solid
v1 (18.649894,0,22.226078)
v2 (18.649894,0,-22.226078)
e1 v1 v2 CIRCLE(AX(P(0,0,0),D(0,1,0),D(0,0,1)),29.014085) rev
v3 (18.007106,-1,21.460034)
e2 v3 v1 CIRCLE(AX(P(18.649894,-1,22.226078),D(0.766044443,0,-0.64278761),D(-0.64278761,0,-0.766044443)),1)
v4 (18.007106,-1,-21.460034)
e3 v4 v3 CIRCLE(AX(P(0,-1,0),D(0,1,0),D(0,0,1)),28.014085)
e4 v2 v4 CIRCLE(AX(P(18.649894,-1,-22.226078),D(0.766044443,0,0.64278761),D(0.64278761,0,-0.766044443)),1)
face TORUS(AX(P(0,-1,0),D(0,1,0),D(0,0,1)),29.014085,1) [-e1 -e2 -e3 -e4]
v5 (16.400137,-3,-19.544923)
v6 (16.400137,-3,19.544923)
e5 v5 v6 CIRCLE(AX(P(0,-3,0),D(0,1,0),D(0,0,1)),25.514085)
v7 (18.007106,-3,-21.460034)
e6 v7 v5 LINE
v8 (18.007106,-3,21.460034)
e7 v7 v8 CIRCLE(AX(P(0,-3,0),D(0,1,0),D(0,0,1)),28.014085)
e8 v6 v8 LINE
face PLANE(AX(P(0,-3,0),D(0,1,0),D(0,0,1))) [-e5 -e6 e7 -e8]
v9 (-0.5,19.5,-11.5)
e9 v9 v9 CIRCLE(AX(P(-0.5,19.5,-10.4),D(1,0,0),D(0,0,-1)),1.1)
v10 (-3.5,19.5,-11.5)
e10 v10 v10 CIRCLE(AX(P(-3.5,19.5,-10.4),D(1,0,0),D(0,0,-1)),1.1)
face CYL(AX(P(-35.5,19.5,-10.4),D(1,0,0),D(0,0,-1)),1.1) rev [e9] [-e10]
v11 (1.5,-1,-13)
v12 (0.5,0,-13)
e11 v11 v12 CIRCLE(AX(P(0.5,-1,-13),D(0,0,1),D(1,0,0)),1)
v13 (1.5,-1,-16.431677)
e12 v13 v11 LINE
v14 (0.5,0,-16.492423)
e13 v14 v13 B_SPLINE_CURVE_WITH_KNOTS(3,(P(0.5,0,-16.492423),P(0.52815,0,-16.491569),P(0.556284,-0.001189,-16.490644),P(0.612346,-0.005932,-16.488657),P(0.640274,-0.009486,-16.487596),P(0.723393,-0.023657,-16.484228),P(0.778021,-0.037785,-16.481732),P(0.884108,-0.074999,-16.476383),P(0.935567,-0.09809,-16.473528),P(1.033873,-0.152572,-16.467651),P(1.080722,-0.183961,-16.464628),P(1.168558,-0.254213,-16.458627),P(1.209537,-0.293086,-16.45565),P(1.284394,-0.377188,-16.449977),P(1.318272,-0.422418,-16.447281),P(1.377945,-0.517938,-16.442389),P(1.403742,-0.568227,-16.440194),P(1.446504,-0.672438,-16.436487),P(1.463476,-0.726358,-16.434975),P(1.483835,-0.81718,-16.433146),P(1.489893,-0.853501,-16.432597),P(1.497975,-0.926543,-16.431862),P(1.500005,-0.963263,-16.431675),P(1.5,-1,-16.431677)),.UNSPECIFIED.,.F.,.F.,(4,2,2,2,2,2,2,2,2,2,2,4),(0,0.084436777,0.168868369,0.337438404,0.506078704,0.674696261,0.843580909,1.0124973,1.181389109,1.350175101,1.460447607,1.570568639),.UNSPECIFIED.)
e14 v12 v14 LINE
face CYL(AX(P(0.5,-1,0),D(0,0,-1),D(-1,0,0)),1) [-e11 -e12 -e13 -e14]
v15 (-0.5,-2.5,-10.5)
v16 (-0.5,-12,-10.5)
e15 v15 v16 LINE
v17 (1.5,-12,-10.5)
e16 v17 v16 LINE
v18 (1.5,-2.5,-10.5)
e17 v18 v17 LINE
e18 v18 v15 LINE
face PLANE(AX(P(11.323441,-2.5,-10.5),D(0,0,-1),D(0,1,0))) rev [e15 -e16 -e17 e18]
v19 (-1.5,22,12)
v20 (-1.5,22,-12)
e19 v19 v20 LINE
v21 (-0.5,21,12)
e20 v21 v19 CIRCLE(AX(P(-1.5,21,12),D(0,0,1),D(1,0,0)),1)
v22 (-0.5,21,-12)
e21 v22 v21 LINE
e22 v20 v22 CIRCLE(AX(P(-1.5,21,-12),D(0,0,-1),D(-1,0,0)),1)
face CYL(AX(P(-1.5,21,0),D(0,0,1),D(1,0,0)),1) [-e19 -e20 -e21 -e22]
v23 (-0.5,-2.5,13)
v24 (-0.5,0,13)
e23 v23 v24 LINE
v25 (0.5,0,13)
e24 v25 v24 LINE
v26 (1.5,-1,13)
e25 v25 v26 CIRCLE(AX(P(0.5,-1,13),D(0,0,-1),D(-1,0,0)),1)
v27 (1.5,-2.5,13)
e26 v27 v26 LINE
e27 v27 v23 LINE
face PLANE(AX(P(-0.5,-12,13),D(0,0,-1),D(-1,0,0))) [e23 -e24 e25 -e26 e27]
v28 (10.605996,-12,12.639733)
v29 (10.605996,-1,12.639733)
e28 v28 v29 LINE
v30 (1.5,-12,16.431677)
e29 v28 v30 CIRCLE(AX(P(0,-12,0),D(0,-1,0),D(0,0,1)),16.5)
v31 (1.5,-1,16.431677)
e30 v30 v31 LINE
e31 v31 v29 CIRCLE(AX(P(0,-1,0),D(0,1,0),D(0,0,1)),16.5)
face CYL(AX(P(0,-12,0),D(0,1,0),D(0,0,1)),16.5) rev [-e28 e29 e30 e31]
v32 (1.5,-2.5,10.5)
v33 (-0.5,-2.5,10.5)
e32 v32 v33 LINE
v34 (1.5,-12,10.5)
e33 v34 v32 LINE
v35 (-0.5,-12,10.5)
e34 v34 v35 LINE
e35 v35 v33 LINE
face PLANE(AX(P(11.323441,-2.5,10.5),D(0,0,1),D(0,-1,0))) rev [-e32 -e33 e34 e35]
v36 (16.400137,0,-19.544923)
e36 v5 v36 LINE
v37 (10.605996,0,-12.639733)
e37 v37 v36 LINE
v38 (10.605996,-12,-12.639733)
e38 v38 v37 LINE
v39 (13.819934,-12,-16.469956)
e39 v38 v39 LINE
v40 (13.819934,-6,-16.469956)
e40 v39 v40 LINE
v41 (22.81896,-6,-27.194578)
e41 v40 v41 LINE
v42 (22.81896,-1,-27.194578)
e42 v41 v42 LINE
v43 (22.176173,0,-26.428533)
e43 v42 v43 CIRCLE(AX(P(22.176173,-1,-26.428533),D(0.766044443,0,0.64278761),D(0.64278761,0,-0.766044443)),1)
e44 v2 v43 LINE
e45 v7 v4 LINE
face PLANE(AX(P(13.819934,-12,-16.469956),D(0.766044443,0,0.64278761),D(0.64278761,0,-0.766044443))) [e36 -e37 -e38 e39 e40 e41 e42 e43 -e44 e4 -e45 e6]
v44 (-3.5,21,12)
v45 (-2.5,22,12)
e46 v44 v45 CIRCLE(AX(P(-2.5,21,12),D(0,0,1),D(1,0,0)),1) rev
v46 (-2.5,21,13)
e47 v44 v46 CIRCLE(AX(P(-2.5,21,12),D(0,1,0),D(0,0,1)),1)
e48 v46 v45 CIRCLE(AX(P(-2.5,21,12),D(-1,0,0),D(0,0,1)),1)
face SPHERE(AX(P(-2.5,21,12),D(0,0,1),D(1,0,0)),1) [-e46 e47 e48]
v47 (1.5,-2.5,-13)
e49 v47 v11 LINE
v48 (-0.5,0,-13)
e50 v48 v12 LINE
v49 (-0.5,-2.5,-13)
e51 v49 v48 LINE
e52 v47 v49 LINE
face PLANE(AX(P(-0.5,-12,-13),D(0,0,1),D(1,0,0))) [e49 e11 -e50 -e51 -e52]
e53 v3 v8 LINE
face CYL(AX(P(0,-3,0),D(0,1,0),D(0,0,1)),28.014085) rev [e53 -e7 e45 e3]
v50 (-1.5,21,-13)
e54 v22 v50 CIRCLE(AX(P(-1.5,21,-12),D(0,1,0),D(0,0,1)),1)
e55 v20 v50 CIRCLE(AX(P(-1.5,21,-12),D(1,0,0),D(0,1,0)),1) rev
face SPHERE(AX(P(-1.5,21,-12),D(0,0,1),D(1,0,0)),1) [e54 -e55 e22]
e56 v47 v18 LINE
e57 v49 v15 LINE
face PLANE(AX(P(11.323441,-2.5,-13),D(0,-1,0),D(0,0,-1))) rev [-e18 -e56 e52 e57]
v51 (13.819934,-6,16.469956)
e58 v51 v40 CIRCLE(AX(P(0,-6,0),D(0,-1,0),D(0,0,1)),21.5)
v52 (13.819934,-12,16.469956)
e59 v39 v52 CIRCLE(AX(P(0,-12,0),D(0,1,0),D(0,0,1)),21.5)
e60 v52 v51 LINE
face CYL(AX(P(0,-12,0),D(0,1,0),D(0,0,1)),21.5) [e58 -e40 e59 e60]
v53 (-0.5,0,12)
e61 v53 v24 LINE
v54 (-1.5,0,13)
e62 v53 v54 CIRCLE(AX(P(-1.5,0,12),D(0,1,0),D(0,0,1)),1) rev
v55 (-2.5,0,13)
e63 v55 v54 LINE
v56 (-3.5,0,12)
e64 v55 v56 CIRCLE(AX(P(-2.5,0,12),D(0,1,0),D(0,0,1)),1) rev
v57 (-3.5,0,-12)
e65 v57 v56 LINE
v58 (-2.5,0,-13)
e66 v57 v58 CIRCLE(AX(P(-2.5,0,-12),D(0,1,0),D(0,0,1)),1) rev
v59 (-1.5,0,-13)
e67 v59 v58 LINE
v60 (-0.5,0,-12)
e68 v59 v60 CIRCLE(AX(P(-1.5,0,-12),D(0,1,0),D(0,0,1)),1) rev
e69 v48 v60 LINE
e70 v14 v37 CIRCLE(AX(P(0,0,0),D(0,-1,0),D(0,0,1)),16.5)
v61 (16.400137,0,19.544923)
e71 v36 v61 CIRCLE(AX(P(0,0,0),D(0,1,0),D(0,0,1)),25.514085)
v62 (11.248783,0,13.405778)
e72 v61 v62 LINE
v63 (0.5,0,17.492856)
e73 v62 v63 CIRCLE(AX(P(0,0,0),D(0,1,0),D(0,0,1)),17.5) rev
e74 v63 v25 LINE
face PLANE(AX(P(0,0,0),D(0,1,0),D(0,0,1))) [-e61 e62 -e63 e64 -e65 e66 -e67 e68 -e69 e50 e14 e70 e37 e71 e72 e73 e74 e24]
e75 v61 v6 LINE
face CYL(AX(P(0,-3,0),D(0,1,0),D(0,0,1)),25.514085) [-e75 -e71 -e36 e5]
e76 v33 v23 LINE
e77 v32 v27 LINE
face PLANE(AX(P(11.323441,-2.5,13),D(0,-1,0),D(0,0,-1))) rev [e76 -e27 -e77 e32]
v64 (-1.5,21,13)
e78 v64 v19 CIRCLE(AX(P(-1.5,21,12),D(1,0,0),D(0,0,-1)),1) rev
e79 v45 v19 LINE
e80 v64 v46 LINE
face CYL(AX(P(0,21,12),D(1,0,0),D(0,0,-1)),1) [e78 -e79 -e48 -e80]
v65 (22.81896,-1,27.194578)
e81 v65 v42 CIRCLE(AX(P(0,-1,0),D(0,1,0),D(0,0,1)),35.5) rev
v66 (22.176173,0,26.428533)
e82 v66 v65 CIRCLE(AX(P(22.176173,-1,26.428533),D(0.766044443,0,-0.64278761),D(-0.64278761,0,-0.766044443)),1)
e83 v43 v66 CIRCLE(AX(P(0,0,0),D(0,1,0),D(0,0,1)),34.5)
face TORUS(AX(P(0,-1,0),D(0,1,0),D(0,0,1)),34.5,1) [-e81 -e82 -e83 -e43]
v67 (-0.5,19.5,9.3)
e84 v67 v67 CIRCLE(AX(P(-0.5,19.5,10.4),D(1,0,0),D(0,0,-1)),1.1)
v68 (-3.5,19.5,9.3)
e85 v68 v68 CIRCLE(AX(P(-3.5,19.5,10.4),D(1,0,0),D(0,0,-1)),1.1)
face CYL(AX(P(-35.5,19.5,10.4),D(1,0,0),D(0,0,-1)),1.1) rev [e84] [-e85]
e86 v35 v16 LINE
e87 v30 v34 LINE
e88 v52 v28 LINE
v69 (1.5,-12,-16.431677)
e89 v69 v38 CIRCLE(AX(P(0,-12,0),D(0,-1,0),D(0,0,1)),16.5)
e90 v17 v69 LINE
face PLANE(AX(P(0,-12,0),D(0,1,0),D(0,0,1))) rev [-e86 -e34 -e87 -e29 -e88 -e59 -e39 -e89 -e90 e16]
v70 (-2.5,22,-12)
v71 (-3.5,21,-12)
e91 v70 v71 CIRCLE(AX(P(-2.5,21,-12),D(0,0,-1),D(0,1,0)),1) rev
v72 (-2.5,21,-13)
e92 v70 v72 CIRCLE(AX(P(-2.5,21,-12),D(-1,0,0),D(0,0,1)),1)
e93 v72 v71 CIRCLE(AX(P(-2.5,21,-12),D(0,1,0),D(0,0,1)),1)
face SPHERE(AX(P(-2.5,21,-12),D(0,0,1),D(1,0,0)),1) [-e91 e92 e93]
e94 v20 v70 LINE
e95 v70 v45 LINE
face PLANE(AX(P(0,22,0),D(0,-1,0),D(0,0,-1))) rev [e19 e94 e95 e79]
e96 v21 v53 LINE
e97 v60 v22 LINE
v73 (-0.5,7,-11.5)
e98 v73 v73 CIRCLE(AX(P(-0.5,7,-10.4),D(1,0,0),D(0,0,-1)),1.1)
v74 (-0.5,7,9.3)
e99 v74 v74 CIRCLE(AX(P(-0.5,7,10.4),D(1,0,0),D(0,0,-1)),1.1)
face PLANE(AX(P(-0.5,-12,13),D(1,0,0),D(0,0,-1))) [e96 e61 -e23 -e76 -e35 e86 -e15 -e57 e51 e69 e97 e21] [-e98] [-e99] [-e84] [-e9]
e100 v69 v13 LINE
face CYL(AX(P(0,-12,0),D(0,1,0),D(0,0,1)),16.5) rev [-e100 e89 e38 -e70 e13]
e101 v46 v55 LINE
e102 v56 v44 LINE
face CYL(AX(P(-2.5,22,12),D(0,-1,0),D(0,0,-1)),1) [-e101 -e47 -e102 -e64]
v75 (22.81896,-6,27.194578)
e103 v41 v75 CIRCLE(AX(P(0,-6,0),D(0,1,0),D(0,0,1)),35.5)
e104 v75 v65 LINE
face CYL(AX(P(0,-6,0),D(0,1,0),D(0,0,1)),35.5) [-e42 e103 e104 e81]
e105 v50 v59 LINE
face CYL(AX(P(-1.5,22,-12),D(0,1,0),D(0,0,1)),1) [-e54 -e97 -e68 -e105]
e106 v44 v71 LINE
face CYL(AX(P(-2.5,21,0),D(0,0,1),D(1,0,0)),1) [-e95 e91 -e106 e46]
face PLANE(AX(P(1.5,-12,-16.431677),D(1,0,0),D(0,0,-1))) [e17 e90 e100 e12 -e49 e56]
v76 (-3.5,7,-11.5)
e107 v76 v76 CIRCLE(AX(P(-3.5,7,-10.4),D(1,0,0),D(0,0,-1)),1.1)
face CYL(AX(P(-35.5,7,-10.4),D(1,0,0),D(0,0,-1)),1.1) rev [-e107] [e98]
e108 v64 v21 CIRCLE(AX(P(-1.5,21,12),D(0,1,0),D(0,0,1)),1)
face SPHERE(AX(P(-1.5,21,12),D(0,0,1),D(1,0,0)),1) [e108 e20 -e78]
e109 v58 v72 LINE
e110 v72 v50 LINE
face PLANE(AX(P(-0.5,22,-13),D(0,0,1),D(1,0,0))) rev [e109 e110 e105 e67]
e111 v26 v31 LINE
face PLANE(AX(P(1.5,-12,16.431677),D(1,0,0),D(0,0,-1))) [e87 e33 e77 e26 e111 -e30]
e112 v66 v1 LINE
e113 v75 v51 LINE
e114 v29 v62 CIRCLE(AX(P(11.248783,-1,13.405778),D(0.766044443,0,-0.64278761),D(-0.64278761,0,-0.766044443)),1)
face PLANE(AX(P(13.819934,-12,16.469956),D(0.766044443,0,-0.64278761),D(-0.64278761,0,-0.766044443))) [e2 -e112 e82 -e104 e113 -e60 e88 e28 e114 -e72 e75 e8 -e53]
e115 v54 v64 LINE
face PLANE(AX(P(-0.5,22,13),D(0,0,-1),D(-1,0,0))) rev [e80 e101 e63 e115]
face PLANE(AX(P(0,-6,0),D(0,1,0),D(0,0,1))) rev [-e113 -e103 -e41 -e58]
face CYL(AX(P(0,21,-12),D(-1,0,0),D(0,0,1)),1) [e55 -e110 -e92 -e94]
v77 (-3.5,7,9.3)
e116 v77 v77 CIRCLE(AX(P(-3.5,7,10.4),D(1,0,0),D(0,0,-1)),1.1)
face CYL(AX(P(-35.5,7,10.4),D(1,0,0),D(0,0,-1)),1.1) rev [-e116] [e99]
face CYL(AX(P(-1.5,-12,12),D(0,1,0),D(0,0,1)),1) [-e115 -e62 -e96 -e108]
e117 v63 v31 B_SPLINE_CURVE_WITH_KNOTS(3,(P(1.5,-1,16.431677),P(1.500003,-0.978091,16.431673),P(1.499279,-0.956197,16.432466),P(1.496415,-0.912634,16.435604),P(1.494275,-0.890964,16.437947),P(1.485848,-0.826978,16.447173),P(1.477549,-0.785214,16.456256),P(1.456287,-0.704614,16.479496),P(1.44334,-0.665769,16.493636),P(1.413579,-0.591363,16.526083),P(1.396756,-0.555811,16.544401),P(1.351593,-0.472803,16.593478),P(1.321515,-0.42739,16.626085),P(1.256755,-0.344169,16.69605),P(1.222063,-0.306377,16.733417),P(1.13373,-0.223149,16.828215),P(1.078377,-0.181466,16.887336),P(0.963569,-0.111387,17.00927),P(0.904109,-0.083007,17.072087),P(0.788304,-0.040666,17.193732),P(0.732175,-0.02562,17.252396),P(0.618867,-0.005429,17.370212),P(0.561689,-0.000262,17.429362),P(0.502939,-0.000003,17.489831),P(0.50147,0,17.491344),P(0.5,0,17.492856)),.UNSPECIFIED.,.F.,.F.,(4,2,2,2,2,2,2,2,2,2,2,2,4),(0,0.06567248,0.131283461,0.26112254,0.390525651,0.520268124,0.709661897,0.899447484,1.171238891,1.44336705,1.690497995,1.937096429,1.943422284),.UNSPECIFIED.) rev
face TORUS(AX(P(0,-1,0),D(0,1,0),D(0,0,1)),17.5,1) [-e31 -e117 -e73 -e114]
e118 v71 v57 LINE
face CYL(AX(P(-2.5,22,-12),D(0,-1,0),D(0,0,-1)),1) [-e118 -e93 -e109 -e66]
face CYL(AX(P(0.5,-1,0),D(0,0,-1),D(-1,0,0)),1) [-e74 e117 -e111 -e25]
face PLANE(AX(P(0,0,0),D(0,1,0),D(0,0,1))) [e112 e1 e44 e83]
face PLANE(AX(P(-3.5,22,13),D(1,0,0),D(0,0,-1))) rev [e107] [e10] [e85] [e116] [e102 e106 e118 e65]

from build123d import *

# Parameters (mm, degrees)
RESSALTO_EXTRUS_O1_DEPTH = 12
RESSALTO_EXTRUS_O3_DEPTH = 6
ESBO_O4_W                = 3
ESBO_O4_H                = 26
RESSALTO_EXTRUS_O4_DEPTH = 22
ESBO_O6_W                = 2.5
ESBO_O6_H                = 9.5
RESSALTO_EXTRUS_O5_DEPTH = 2
ESBO_O7_R                = 1.1
CORTE_EXTRUS_O1_DEPTH    = 55.490824916
ESBO_O8_R                = 28.014084507
ESBO_O8_R_2              = 25.514084507
CORTE_EXTRUS_O2_DEPTH    = 3
FILETE1_R                = 1


with BuildPart() as part:
    # Esboço1 → Ressalto-extrusão1 (new body)
    with BuildSketch(Plane(origin=(0, 0, 0), x_dir=(1, 0, 0), z_dir=(0, 1, 0))):
        with BuildLine():
            Line((1.5, -16.431676725), (1.5, -13))
            Line((1.5, -13), (-0.5, -13))
            Line((-0.5, -13), (-0.5, 13))
            Line((-0.5, 13), (1.5, 13))
            Line((1.5, 13), (1.5, 16.431676725))
            ThreePointArc((1.5, 16.431676725), (6.342987532, 15.232088142), (10.60599556, 12.639733311))
            Line((10.60599556, 12.639733311), (13.819933608, 16.469955527))
            ThreePointArc((13.819933608, 16.469955527), (-21.5, 0), (13.819933608, -16.469955527))
            Line((13.819933608, -16.469955527), (10.60599556, -12.639733311))
            ThreePointArc((10.60599556, -12.639733311), (6.342987532, -15.232088142), (1.5, -16.431676725))
        make_face()
    extrude(amount=-RESSALTO_EXTRUS_O1_DEPTH)

    # Esboço3 → Ressalto-extrusão3 (add)
    with BuildSketch(Plane(origin=(0, 0, 0), x_dir=(1, 0, 0), z_dir=(0, 1, 0))):
        with BuildLine():
            Line((13.819933608, -16.469955527), (22.818960144, -27.194577731))
            ThreePointArc((22.818960144, -27.194577731), (-35.5, 0), (22.818960144, 27.194577731))
            Line((22.818960144, 27.194577731), (13.819933608, 16.469955527))
            ThreePointArc((13.819933608, 16.469955527), (-21.5, 0), (13.819933608, -16.469955527))
        make_face()
    extrude(amount=-RESSALTO_EXTRUS_O3_DEPTH)

    # Esboço4 → Ressalto-extrusão4 (add)
    with BuildSketch(Plane(origin=(0, 0, 0), x_dir=(1, 0, 0), z_dir=(0, 1, 0))):
        with Locations((-2, 0)):
            Rectangle(ESBO_O4_W, ESBO_O4_H)
    extrude(amount=RESSALTO_EXTRUS_O4_DEPTH)

    # Esboço6 → Ressalto-extrusão5 (add)
    with BuildSketch(Plane(origin=(-0.5, 0, 0), x_dir=(0, 0, -1), z_dir=(1, 0, 0))):
        with Locations((-11.75, -7.25)):
            Rectangle(ESBO_O6_W, ESBO_O6_H)
        with Locations((11.75, -7.25)):
            Rectangle(ESBO_O6_W, ESBO_O6_H)
    extrude(amount=RESSALTO_EXTRUS_O5_DEPTH)

    # Esboço7 → Corte-extrusão1 (cut, through all)
    with BuildSketch(Plane(origin=(-0.5, 0, 0), x_dir=(0, 0, -1), z_dir=(1, 0, 0))):
        with Locations((-10.4, 19.5)):
            Circle(ESBO_O7_R)
        with Locations((10.4, 19.5)):
            Circle(ESBO_O7_R)
        with Locations((10.4, 7)):
            Circle(ESBO_O7_R)
        with Locations((-10.4, 7)):
            Circle(ESBO_O7_R)
    extrude(amount=-CORTE_EXTRUS_O1_DEPTH, mode=Mode.SUBTRACT)

    # Esboço8 → Corte-extrusão2 (cut)
    with BuildSketch(Plane(origin=(0, 0, 0), x_dir=(1, 0, 0), z_dir=(0, 1, 0))):
        Circle(ESBO_O8_R)
        Circle(ESBO_O8_R_2, mode=Mode.SUBTRACT)
    extrude(amount=-CORTE_EXTRUS_O2_DEPTH, mode=Mode.SUBTRACT)

    # Filete1
    # the kernel refuses this fillet: 1 mm, written as the material it takes off along each edge
    with BuildSketch(Plane(origin=(-2.5, 21, 12), x_dir=(0, 0, 1), z_dir=(-1, 0, 0))) as filete1_piece_1_section:
        Polygon((0, 0), (FILETE1_R * 1.02, 0), (FILETE1_R * 1.02, FILETE1_R * 1.02), (0, FILETE1_R * 1.02), align=None)
    filete1_piece_1 = extrude(amount=FILETE1_R * 1.02, mode=Mode.PRIVATE)
    filete1_piece_1 = filete1_piece_1 - Plane(origin=(-2.5, 21, 12), x_dir=(0, -0.7071067811865475, -0.7071067811865475), z_dir=(-1, 0, 0)) * Sphere(FILETE1_R, mode=Mode.PRIVATE)
    add(filete1_piece_1, mode=Mode.SUBTRACT)
    with BuildSketch(Plane(origin=(-1.5, 21, 12), x_dir=(0, 0, 1), z_dir=(0, 1, 0))) as filete1_piece_2_section:
        Polygon((0, 0), (FILETE1_R * 1.02, 0), (FILETE1_R * 1.02, FILETE1_R * 1.02), (0, FILETE1_R * 1.02), align=None)
    filete1_piece_2 = extrude(amount=FILETE1_R * 1.02, mode=Mode.PRIVATE)
    filete1_piece_2 = filete1_piece_2 - Plane(origin=(-1.5, 21, 12), x_dir=(-0.7071067811865476, 0, -0.7071067811865475), z_dir=(0, 1, 0)) * Sphere(FILETE1_R, mode=Mode.PRIVATE)
    add(filete1_piece_2, mode=Mode.SUBTRACT)
    with BuildSketch(Plane(origin=(-1.5, 21, -12), x_dir=(1, 0, 0), z_dir=(0, 1, 0))) as filete1_piece_3_section:
        Polygon((0, 0), (FILETE1_R * 1.02, 0), (FILETE1_R * 1.02, FILETE1_R * 1.02), (0, FILETE1_R * 1.02), align=None)
    filete1_piece_3 = extrude(amount=FILETE1_R * 1.02, mode=Mode.PRIVATE)
    filete1_piece_3 = filete1_piece_3 - Plane(origin=(-1.5, 21, -12), x_dir=(-0.7071067811865475, 0, 0.7071067811865477), z_dir=(0, 1, 0)) * Sphere(FILETE1_R, mode=Mode.PRIVATE)
    add(filete1_piece_3, mode=Mode.SUBTRACT)
    with BuildSketch(Plane(origin=(-2.5, 21, -12), x_dir=(0, 1, 0), z_dir=(-1, 0, 0))) as filete1_piece_4_section:
        Polygon((0, 0), (FILETE1_R * 1.02, 0), (FILETE1_R * 1.02, FILETE1_R * 1.02), (0, FILETE1_R * 1.02), align=None)
    filete1_piece_4 = extrude(amount=FILETE1_R * 1.02, mode=Mode.PRIVATE)
    filete1_piece_4 = filete1_piece_4 - Plane(origin=(-2.5, 21, -12), x_dir=(0, -0.7071067811865475, 0.7071067811865475), z_dir=(-1, 0, 0)) * Sphere(FILETE1_R, mode=Mode.PRIVATE)
    add(filete1_piece_4, mode=Mode.SUBTRACT)
    with BuildSketch(Plane(origin=(1.5, 0, -10.5), x_dir=(-1, 0, 0), z_dir=(0, 0, -1))) as filete1_piece_5_section:
        with BuildLine():
            CenterArc((FILETE1_R, -FILETE1_R), FILETE1_R, 90, 90)
            Line((0, -FILETE1_R), (0, 0))
            Line((0, 0), (FILETE1_R, 0))
        make_face()
    filete1_piece_5 = extrude(amount=8.431676725, mode=Mode.PRIVATE)
    filete1_piece_5 = filete1_piece_5 & Plane(origin=(0, 0, 0), x_dir=(0.09090909090909027, 0, -0.9958591954639385), z_dir=(0, 1, 0)) * Cylinder(16.5, 21, mode=Mode.PRIVATE)
    add(filete1_piece_5, mode=Mode.SUBTRACT)
    with BuildSketch(Plane(origin=(0, 0, 0), x_dir=(0.7087130276081794, 0, -0.7054968777382703), z_dir=(0.7054968777382703, 0, 0.7087130276081794))) as filete1_piece_6:
        with BuildLine():
            CenterArc((28.014084507 + FILETE1_R, -FILETE1_R), FILETE1_R, 90, 90)
            Line((28.014084507, -FILETE1_R), (28.014084507, 0))
            Line((28.014084507, 0), (28.014084507 + FILETE1_R, 0))
        make_face()
    revolve(axis=Axis((0, 0, 0), (0, 1, 0)), revolution_arc=270.260599923, mode=Mode.SUBTRACT)
    with BuildSketch(Plane(origin=(1.5, 0, 18.931676725), x_dir=(-1, 0, 0), z_dir=(0, 0, -1))) as filete1_piece_7_section:
        with BuildLine():
            CenterArc((FILETE1_R, -FILETE1_R), FILETE1_R, 90, 90)
            Line((0, -FILETE1_R), (0, 0))
            Line((0, 0), (FILETE1_R, 0))
        make_face()
    filete1_piece_7 = extrude(amount=8.431676725, mode=Mode.PRIVATE)
    filete1_piece_7 = filete1_piece_7 & Plane(origin=(0, 0, 0), x_dir=(0.6427876096865377, 0, 0.7660444431189795), z_dir=(0, 1, 0)) * Cylinder(16.5, 21, mode=Mode.PRIVATE)
    add(filete1_piece_7, mode=Mode.SUBTRACT)
    with BuildSketch(Plane(origin=(0, 0, 0), x_dir=(0.7510532880617147, 0, 0.6602415910041466), z_dir=(0.6602415910041466, 0, -0.7510532880617147))) as filete1_piece_8_section:
        with BuildLine():
            CenterArc((16.5 + FILETE1_R, FILETE1_R), FILETE1_R, 180, 90)
            Line((16.5, FILETE1_R), (16.5, 0))
            Line((16.5, 0), (16.5 + FILETE1_R, 0))
        make_face()
    filete1_piece_8 = revolve(axis=Axis((0, 0, 0), (0, -1, 0)), revolution_arc=52.147490436, mode=Mode.PRIVATE)
    filete1_piece_8 = split(filete1_piece_8, bisect_by=Plane(origin=(1.5, 0, 0), z_dir=(1, 0, 0)), keep=Keep.TOP, mode=Mode.PRIVATE)
    add(filete1_piece_8, mode=Mode.SUBTRACT)
    with BuildSketch(Plane(origin=(0, 0, 0), x_dir=(0.6952666452885745, 0, 0.7187518987447418), z_dir=(0.7187518987447418, 0, -0.6952666452885745))) as filete1_piece_9:
        with BuildLine():
            CenterArc((35.5 - FILETE1_R, FILETE1_R), FILETE1_R, 270, 90)
            Line((35.5 - FILETE1_R, 0), (35.5, 0))
            Line((35.5, 0), (35.5, FILETE1_R))
        make_face()
    revolve(axis=Axis((0, 0, 0), (0, -1, 0)), revolution_arc=268.096938404, mode=Mode.SUBTRACT)
    with BuildSketch(Plane(origin=(-3.5, 0, 13), x_dir=(0, 0, -1), z_dir=(0, 1, 0)), Plane(origin=(-0.5, 0, 13), x_dir=(-1, 0, 0), z_dir=(0, 1, 0)), Plane(origin=(-3.5, 0, -13), x_dir=(1, 0, 0), z_dir=(0, 1, 0))) as filete1_piece_10:
        with BuildLine():
            CenterArc((FILETE1_R, -FILETE1_R), FILETE1_R, 90, 90)
            Line((0, -FILETE1_R), (0, 0))
            Line((0, 0), (FILETE1_R, 0))
        make_face()
    extrude(amount=21, mode=Mode.SUBTRACT)
    with BuildSketch(Plane(origin=(-0.5, 0, -13), x_dir=(-1, 0, 0), z_dir=(0, 1, 0))) as filete1_piece_11:
        with BuildLine():
            CenterArc((FILETE1_R, FILETE1_R), FILETE1_R, 180, 90)
            Line((0, FILETE1_R), (0, 0))
            Line((0, 0), (FILETE1_R, 0))
        make_face()
    extrude(amount=21, mode=Mode.SUBTRACT)
    with BuildSketch(Plane(origin=(-2.5, 22, 13), x_dir=(0, -1, 0), z_dir=(1, 0, 0)), Plane(origin=(-1.5, 22, -13), x_dir=(0, -1, 0), z_dir=(-1, 0, 0))) as filete1_piece_12:
        with BuildLine():
            CenterArc((FILETE1_R, FILETE1_R), FILETE1_R, 180, 90)
            Line((0, FILETE1_R), (0, 0))
            Line((0, 0), (FILETE1_R, 0))
        make_face()
    extrude(amount=1, mode=Mode.SUBTRACT)
    with BuildSketch(Plane(origin=(-0.5, 22, 12), x_dir=(0, -1, 0), z_dir=(0, 0, -1)), Plane(origin=(-3.5, 22, -12), x_dir=(0, -1, 0), z_dir=(0, 0, 1))) as filete1_piece_13:
        with BuildLine():
            CenterArc((FILETE1_R, FILETE1_R), FILETE1_R, 180, 90)
            Line((0, FILETE1_R), (0, 0))
            Line((0, 0), (FILETE1_R, 0))
        make_face()
    extrude(amount=24, mode=Mode.SUBTRACT)
    with BuildSketch(Plane(origin=(1.5, 0, 18.931676725), x_dir=(-1, 0, 0), z_dir=(0, 0, -1))) as filete1_piece_14a_section:
        with BuildLine():
            CenterArc((FILETE1_R, -FILETE1_R), FILETE1_R, 90, 90)
            Line((0, -FILETE1_R), (0, 0))
            Line((0, 0), (FILETE1_R, 0))
        make_face()
    filete1_piece_14a = extrude(amount=5.931676725, mode=Mode.PRIVATE)
    filete1_piece_14a = filete1_piece_14a - Plane(origin=(0, 0, 0), x_dir=(0.6427876096865377, 0, 0.7660444431189795), z_dir=(0, 1, 0)) * Cylinder(16.5, 16, mode=Mode.PRIVATE)
    with BuildSketch(Plane(origin=(0, 0, 0), x_dir=(0.6427876096865377, 0, 0.7660444431189793), z_dir=(0.7660444431189793, 0, -0.6427876096865377))) as filete1_piece_14b_section:
        with BuildLine():
            CenterArc((16.5 + FILETE1_R, FILETE1_R), FILETE1_R, 180, 90)
            Line((16.5, FILETE1_R), (16.5, 0))
            Line((16.5, 0), (16.5 + FILETE1_R, 0))
        make_face()
    filete1_piece_14b = revolve(axis=Axis((0, 0, 0), (0, -1, 0)), revolution_arc=43.465790933, mode=Mode.PRIVATE)
    filete1_piece_14b = split(filete1_piece_14b, bisect_by=Plane(origin=(1.5, 0, 0), z_dir=(-1, 0, 0)), keep=Keep.TOP, mode=Mode.PRIVATE)
    filete1_piece_14 = filete1_piece_14a & filete1_piece_14b
    add(filete1_piece_14, mode=Mode.SUBTRACT)


solid = part.part
